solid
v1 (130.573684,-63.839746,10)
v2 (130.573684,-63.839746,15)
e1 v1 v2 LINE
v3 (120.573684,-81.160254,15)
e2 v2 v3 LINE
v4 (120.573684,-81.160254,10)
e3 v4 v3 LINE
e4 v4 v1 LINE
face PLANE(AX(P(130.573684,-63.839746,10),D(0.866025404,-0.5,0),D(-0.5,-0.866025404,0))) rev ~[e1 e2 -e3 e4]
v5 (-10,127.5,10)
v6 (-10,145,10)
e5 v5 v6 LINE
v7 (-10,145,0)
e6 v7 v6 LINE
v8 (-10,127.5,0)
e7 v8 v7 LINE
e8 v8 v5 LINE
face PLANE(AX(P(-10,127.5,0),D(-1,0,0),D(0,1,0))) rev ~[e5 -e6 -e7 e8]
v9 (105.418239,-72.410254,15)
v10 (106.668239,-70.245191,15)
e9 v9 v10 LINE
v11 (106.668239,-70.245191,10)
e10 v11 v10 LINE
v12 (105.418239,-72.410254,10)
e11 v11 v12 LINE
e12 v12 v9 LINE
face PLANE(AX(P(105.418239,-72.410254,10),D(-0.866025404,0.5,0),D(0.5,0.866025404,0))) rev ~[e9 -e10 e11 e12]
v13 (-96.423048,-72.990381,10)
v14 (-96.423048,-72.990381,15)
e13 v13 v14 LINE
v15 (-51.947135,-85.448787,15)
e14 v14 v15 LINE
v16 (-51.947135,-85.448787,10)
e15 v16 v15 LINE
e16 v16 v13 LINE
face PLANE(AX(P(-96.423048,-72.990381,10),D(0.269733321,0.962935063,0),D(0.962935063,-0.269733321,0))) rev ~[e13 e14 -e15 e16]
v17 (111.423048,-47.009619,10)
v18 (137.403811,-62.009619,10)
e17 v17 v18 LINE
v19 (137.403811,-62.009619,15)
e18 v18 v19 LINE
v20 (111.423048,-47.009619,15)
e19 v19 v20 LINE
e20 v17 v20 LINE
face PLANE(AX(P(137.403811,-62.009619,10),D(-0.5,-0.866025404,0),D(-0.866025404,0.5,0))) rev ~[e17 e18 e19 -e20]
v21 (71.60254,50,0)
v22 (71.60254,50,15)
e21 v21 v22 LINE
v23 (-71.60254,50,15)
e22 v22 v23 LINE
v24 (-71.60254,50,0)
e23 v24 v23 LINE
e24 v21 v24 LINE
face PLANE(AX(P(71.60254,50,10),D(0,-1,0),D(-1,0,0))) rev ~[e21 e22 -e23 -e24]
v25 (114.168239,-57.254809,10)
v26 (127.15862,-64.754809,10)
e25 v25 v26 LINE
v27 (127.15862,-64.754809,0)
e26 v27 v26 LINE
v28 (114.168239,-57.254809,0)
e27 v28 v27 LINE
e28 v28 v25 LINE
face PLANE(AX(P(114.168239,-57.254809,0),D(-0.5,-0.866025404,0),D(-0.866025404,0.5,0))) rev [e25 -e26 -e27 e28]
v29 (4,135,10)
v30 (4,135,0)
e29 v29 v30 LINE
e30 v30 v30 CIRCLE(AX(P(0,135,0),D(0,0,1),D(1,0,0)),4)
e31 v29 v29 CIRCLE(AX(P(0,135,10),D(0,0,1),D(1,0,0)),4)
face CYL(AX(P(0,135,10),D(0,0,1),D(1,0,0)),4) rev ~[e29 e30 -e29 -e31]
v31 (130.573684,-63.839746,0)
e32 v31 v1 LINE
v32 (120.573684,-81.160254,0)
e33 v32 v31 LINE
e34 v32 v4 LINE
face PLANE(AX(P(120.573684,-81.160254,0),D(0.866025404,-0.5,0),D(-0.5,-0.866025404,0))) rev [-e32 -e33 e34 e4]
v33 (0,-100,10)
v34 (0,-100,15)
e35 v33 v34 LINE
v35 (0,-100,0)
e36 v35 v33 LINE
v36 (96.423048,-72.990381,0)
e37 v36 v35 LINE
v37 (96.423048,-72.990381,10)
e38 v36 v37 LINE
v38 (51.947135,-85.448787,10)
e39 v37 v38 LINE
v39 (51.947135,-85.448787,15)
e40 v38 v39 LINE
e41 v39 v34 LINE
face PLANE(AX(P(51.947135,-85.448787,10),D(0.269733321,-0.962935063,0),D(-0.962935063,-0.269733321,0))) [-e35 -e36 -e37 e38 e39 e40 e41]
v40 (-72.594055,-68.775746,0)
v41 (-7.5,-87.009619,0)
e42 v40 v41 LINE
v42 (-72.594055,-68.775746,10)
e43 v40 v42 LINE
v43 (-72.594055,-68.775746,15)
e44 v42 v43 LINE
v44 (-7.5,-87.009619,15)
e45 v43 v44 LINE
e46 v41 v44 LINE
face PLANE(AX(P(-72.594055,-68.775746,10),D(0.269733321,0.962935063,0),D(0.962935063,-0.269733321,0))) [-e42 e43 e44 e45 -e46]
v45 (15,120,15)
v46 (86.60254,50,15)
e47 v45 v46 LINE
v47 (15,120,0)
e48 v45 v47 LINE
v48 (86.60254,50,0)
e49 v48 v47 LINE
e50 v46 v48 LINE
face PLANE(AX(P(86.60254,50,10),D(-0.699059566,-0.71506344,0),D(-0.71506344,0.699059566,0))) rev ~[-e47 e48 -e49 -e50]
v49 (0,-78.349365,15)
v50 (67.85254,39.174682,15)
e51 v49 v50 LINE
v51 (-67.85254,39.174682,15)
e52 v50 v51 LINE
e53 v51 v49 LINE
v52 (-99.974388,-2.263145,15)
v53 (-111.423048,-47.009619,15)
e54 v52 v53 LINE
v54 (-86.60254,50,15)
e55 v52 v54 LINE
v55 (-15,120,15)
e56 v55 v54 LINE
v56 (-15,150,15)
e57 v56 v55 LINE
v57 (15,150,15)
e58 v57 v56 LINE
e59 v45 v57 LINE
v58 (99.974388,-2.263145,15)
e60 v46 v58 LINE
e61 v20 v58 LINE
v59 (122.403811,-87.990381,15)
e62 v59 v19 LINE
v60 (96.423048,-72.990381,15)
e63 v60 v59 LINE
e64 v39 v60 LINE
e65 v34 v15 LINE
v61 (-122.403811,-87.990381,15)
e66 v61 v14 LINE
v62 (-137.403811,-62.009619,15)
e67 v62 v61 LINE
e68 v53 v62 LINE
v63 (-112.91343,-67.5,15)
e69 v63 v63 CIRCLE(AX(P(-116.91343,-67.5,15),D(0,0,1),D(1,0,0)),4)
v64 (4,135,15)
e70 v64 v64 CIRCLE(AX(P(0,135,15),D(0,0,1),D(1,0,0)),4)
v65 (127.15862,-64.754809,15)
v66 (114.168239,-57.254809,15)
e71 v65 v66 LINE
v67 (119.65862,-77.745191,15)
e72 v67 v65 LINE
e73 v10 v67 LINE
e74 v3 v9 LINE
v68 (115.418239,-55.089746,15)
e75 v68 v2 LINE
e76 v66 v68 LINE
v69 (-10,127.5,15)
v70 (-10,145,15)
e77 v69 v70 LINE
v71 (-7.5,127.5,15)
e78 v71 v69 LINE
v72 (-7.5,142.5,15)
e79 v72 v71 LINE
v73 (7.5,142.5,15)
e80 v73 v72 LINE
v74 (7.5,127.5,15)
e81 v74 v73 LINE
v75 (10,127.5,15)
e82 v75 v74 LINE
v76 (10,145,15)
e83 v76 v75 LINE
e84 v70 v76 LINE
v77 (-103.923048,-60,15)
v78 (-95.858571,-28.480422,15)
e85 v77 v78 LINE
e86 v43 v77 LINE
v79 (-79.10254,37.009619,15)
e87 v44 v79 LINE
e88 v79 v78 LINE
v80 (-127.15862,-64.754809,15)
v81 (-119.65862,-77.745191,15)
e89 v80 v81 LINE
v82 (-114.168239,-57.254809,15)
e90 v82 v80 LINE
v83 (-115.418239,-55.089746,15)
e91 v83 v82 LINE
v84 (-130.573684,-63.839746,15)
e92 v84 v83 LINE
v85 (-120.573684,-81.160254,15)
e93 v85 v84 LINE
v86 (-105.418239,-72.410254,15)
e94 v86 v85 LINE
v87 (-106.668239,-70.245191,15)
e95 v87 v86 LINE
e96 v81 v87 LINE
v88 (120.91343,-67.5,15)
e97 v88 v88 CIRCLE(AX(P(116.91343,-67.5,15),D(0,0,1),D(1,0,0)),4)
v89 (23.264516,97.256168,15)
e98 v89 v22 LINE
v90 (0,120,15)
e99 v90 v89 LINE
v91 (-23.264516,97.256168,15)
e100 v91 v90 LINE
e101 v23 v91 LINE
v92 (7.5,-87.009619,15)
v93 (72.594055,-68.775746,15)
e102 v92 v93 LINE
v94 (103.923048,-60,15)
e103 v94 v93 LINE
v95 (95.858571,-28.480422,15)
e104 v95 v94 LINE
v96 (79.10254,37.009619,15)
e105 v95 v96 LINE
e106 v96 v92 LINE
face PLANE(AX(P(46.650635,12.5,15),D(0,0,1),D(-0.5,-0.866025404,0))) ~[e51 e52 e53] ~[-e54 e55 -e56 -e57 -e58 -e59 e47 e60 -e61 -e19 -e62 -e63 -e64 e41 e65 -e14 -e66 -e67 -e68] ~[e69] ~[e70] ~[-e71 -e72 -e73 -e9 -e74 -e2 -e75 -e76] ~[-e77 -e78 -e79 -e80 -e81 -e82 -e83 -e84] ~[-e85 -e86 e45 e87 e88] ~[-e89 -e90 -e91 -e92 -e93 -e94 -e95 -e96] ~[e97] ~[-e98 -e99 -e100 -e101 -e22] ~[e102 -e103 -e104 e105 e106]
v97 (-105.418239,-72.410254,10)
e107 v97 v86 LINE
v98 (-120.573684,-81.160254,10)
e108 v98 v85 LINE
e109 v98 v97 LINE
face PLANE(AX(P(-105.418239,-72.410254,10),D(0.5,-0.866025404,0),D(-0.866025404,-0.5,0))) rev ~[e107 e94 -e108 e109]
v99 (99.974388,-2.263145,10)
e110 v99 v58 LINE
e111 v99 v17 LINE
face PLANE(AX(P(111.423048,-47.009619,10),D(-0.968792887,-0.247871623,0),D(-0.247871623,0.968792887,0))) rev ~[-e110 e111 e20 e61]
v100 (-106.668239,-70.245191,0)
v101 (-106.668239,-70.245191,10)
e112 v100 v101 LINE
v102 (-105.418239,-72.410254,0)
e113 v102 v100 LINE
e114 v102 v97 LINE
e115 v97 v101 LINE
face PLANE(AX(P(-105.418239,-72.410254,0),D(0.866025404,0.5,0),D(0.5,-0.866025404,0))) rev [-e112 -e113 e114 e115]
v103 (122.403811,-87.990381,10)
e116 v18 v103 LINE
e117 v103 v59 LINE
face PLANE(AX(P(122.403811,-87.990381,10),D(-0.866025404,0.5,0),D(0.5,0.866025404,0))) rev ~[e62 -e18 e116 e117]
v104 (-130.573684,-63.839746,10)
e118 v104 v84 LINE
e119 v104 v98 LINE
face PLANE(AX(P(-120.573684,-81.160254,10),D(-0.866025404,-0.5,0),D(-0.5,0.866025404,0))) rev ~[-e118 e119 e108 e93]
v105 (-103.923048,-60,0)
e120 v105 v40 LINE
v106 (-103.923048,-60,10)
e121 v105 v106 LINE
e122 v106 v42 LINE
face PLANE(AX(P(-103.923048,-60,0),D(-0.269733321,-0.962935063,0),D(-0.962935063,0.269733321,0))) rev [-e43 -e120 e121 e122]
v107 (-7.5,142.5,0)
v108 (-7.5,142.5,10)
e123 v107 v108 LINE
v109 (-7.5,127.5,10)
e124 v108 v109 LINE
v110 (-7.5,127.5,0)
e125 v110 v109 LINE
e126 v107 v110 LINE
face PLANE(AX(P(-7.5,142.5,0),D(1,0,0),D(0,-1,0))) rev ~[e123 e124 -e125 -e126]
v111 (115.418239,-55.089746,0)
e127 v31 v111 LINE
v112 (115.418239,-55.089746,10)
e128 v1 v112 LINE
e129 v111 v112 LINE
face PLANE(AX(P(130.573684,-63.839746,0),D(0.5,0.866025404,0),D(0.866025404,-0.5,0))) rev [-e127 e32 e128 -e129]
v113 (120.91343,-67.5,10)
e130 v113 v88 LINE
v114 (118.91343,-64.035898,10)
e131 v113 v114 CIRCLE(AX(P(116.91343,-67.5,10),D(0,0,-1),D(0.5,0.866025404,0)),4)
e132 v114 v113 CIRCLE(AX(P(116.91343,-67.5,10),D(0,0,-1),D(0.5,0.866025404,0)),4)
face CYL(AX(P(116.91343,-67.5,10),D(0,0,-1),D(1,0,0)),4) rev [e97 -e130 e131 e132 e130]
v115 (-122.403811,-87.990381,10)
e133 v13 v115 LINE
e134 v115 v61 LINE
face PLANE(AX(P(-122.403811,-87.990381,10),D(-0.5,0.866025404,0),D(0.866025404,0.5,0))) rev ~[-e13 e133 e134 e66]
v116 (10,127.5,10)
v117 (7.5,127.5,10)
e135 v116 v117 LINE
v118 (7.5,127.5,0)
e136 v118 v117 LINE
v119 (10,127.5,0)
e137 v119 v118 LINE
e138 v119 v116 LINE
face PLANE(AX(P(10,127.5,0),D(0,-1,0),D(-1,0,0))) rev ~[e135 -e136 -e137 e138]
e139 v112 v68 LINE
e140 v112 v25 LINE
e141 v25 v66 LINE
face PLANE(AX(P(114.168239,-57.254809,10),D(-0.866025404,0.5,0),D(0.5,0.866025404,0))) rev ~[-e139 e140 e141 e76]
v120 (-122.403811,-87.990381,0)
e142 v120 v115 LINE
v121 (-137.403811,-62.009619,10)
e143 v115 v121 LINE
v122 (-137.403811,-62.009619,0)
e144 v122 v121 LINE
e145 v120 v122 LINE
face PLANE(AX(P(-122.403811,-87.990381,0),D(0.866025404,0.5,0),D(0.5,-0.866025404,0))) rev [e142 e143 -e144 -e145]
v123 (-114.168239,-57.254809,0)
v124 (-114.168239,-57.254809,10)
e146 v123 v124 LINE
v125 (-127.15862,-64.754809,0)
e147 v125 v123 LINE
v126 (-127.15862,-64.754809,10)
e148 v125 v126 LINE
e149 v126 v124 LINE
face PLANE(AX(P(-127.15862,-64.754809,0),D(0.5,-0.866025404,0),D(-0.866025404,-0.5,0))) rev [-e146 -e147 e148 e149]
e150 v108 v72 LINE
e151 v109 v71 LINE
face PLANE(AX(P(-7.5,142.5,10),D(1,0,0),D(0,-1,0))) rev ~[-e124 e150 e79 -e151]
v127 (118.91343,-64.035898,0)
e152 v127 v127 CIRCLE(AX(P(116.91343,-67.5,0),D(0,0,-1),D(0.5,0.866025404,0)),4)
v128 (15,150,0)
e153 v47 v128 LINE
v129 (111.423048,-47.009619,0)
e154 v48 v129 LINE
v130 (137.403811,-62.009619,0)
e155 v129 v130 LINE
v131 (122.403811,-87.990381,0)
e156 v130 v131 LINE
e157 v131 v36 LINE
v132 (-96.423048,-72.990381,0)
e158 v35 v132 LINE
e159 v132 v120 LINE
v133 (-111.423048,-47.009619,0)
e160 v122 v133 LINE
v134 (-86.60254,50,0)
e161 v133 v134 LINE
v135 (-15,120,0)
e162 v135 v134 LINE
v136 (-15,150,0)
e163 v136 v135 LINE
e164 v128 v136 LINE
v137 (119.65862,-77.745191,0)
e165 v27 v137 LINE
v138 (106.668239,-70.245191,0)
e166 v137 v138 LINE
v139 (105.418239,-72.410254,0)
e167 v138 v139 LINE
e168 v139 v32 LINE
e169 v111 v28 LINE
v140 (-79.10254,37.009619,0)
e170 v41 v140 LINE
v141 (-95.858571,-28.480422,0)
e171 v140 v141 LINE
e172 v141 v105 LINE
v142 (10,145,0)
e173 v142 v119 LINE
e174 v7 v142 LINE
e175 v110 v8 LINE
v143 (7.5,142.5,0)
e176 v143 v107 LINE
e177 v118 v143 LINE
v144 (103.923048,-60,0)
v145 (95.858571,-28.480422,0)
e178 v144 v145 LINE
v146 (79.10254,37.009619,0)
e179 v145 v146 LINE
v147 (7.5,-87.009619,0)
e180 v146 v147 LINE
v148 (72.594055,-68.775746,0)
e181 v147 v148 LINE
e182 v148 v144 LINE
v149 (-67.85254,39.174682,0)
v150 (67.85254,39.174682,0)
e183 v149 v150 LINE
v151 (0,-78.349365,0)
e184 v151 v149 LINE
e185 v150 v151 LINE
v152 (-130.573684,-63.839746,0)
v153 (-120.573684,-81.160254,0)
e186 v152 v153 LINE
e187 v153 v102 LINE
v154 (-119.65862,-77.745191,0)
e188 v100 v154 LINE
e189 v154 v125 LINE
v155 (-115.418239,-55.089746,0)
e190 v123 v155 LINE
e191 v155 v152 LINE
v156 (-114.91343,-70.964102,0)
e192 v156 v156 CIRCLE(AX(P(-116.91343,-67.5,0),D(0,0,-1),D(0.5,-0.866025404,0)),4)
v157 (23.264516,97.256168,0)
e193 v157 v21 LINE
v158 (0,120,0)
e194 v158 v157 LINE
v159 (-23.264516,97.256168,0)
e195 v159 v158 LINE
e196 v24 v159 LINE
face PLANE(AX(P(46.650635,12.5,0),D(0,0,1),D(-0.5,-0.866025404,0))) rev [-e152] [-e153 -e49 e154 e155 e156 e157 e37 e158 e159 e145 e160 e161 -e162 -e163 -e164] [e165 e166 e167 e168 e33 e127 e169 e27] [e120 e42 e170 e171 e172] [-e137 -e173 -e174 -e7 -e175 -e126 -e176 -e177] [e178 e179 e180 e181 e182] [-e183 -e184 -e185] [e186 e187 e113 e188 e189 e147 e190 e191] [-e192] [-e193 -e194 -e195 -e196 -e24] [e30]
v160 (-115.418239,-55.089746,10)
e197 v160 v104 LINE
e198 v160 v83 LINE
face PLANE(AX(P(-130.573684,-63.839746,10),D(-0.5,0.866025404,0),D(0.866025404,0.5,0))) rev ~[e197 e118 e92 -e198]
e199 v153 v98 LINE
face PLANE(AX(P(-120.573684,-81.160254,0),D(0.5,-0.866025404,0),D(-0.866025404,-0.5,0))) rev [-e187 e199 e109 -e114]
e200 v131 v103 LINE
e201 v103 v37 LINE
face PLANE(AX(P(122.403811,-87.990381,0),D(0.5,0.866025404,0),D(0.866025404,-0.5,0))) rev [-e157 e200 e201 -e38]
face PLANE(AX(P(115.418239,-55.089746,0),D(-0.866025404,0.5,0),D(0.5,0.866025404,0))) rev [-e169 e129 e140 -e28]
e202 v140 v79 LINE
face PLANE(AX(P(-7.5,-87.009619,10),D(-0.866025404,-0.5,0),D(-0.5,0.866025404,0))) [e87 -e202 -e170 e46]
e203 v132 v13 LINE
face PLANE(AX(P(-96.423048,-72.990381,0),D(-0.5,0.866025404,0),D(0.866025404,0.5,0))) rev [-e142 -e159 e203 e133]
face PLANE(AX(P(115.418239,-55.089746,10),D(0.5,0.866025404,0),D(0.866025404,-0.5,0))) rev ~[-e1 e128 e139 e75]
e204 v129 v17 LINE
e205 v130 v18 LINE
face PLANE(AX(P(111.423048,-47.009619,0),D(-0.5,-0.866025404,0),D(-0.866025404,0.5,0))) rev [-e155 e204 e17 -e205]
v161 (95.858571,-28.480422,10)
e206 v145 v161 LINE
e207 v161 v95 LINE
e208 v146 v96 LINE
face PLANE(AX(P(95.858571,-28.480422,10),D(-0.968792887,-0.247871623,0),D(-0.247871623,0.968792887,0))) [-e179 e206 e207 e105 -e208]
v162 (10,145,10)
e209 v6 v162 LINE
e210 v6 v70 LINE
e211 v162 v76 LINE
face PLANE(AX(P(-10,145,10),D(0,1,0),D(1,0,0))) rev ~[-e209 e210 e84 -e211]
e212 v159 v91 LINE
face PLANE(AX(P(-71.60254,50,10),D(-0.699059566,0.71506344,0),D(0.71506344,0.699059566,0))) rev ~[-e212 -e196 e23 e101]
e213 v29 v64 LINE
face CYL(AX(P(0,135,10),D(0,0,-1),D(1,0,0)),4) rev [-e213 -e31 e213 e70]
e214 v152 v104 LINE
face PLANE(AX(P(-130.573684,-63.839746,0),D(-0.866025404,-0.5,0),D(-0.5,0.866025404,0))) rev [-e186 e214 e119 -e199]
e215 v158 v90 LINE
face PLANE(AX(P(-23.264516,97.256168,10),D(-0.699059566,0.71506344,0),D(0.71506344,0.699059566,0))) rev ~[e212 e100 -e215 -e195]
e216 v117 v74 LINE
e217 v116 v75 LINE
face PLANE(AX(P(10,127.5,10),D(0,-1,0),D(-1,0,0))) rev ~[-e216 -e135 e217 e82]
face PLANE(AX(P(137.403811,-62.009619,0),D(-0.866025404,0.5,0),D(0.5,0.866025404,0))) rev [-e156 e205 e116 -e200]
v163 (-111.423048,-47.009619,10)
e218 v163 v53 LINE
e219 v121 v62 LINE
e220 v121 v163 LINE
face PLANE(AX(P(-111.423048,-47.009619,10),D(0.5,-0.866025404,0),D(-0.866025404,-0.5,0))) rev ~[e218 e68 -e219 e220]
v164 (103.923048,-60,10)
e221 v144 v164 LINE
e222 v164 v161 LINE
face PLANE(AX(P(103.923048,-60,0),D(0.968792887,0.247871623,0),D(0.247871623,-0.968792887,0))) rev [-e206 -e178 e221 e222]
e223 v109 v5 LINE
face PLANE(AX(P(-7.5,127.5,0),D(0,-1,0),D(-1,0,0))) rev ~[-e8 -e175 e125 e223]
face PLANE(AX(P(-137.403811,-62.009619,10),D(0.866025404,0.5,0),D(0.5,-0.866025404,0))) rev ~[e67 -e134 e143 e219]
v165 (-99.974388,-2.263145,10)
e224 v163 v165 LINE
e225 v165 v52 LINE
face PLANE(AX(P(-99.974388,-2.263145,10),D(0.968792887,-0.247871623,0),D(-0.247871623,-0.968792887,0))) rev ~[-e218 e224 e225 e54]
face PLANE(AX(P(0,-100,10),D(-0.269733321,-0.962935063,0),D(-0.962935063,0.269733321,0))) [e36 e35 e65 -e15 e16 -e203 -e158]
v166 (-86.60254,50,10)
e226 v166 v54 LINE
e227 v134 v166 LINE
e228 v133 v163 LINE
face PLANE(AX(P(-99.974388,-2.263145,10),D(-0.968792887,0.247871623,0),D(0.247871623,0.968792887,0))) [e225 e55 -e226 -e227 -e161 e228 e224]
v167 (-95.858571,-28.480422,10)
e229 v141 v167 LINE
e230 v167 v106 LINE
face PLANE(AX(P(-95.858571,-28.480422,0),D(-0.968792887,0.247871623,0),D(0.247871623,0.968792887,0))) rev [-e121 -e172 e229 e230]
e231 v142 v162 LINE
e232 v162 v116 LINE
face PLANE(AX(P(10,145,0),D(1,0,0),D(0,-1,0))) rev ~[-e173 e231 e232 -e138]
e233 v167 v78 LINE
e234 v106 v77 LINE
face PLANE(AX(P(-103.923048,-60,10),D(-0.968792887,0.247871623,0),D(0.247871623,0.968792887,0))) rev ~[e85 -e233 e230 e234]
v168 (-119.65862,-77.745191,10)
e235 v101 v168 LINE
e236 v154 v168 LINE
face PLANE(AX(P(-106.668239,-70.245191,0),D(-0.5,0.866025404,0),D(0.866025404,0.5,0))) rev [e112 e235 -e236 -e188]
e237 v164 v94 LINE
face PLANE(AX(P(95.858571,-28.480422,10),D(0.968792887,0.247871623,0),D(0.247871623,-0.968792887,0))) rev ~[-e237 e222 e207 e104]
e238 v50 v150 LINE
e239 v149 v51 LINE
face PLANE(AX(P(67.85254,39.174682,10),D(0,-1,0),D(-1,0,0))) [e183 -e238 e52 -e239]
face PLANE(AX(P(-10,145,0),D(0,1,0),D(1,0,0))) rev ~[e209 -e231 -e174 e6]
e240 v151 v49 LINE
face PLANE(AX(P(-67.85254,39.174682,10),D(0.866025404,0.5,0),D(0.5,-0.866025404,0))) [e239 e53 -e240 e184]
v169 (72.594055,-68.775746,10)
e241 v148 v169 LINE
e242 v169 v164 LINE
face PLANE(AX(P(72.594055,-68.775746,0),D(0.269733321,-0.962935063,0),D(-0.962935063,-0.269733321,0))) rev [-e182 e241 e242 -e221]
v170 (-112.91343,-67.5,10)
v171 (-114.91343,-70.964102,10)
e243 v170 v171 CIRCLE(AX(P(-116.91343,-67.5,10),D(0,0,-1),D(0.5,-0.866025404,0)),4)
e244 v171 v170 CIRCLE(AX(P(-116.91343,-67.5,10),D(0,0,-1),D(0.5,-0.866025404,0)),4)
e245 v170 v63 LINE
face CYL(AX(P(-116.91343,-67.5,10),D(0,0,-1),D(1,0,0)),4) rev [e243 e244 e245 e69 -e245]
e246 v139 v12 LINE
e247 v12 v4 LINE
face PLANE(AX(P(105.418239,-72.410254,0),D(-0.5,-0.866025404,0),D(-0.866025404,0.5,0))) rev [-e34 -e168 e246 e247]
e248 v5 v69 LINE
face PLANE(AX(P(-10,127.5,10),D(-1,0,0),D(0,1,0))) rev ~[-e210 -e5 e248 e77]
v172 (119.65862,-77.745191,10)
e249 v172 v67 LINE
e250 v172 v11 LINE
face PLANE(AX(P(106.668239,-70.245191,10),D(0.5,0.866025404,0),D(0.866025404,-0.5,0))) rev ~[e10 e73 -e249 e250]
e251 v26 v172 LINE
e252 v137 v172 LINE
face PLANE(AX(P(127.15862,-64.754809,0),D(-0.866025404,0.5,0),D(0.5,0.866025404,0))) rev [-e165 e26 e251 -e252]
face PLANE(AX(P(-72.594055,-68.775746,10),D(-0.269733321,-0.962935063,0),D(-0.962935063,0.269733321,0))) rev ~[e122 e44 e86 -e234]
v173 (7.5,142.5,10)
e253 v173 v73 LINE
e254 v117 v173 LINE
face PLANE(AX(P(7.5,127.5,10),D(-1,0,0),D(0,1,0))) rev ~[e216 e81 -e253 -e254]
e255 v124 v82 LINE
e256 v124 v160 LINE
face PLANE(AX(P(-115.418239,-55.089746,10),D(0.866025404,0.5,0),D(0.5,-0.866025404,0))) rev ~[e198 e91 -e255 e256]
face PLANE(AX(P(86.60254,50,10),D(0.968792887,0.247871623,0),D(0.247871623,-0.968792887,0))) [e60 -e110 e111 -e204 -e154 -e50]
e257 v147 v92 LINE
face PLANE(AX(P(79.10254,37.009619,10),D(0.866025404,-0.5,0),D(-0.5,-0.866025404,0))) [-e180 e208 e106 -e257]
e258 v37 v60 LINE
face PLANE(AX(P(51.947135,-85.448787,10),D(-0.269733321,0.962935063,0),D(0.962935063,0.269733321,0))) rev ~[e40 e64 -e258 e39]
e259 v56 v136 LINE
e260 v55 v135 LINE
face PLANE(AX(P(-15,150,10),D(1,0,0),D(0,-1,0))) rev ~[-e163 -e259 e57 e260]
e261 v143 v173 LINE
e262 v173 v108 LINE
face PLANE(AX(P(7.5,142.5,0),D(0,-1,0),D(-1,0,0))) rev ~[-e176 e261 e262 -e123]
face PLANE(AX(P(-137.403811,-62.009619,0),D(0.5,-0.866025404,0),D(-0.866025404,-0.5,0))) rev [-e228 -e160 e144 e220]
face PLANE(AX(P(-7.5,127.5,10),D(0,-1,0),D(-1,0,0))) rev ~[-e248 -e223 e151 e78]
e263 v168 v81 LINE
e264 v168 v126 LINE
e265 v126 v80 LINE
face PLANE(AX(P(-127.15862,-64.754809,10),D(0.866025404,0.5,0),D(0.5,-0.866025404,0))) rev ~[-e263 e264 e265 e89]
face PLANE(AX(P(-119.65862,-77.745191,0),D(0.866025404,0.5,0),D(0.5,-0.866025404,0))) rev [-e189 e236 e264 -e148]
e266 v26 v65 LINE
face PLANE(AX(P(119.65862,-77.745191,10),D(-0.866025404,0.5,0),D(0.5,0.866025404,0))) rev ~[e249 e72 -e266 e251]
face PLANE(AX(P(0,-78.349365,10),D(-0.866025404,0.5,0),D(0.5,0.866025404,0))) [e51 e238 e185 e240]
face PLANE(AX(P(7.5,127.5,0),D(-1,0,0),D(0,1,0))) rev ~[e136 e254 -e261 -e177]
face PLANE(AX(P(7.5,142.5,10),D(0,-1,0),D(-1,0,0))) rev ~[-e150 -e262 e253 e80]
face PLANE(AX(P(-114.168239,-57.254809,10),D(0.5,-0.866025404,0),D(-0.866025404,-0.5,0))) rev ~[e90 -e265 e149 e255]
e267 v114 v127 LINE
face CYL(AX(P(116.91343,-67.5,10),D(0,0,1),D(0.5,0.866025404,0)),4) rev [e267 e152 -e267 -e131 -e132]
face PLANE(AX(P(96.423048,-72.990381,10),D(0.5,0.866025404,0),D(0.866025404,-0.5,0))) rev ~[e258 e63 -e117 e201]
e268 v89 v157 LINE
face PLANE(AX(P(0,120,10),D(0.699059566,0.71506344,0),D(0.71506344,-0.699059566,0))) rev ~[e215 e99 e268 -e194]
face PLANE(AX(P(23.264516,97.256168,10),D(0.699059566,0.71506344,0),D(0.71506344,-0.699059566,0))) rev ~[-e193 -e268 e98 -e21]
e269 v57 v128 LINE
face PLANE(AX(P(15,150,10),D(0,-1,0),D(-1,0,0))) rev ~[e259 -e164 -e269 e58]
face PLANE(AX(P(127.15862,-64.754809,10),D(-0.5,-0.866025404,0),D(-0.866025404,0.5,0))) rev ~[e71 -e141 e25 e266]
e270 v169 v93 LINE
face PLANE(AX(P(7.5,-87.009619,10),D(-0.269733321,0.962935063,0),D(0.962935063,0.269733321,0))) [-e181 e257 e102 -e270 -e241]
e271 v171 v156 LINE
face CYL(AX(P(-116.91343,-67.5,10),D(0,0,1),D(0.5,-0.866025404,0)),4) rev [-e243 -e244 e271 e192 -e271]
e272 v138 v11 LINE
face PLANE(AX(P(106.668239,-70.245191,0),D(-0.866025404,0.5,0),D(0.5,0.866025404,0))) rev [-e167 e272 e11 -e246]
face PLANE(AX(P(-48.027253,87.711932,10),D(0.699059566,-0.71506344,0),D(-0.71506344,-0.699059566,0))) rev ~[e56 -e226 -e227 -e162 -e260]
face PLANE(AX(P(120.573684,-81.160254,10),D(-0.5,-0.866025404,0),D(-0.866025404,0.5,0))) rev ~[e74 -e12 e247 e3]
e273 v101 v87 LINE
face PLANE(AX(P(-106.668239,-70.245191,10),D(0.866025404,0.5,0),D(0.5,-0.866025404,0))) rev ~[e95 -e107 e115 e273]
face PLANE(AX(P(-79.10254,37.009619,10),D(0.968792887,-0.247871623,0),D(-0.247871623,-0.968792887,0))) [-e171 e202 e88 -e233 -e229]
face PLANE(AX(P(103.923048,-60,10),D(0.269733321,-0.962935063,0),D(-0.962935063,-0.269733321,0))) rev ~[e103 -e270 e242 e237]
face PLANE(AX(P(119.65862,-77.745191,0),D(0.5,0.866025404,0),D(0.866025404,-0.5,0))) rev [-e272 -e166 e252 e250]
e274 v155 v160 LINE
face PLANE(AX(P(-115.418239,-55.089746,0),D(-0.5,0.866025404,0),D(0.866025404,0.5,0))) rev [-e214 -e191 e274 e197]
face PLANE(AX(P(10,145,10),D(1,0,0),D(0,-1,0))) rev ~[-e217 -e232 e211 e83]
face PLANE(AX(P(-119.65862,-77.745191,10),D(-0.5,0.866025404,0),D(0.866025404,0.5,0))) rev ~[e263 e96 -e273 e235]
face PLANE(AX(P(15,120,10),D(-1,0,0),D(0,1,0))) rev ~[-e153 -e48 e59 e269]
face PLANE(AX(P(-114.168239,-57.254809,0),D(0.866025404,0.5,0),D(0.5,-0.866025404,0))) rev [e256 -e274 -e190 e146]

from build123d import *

# Parameters (mm, degrees)
F1_DEPTH  = 10
F2_R      = 4
F3_DEPTH  = 25
F7_DEPTH  = 25
F8_R      = 4
F9_DEPTH  = 5
F10_DEPTH = 5


# Not quite as in the source:
# - after a boolean that leaves OpenCascade's solid faulty, fix() repairs it


with BuildPart() as f1:
    # F0 (on Top) → F1 (new body)
    with BuildSketch(Plane.XY):
        Polygon((0, 0), (86.6025403784, 50), (71.6025403784, 50), (0, 50), align=None)
        Polygon((-86.6025403784, 50), (0, 0), (0, 50), (-71.6025403784, 50), align=None)
        Polygon((0, 120), (15, 120), (15, 150), (-15, 150), (-15, 120), align=None)
        Polygon((10, 125), (0, 125), (-10, 125), (-10, 127.5), (-10, 145), (10, 145), (10, 127.5), align=None, mode=Mode.SUBTRACT)
        with BuildLine():
            Line((71.6025403784, 50), (86.6025403784, 50))
            Line((86.6025403784, 50), (48.027253047, 87.7119317126))
            ThreePointArc((48.027253047, 87.7119317126), (35.9639012974, 93.309151767), (23.2645159855, 97.2561684211))
            Line((23.2645159855, 97.2561684211), (71.6025403784, 50))
        make_face()
        with BuildLine():
            Line((-48.027253047, 87.7119317126), (-86.6025403784, 50))
            Line((-86.6025403784, 50), (-71.6025403784, 50))
            Line((-71.6025403784, 50), (-23.2645159855, 97.2561684211))
            ThreePointArc((-23.2645159855, 97.2561684211), (-35.9639012974, 93.309151767), (-48.027253047, 87.7119317126))
        make_face()
        with BuildLine():
            ThreePointArc((23.2645159855, 97.2561684211), (35.9639012974, 93.309151767), (48.027253047, 87.7119317126))
            Line((48.027253047, 87.7119317126), (15, 120))
            Line((15, 120), (0, 120))
            Line((0, 120), (23.2645159855, 97.2561684211))
        make_face()
        with BuildLine():
            Line((-23.2645159855, 97.2561684211), (0, 120))
            Line((0, 120), (-15, 120))
            Line((-15, 120), (-48.027253047, 87.7119317126))
            ThreePointArc((-48.027253047, 87.7119317126), (-35.9639012974, 93.309151767), (-23.2645159855, 97.2561684211))
        make_face()
        Polygon((-7.5, 127.5), (7.5, 127.5), (0, 135), align=None)
        Polygon((0, 135), (7.5, 127.5), (7.5, 142.5), align=None)
        Polygon((-7.5, 142.5), (-7.5, 127.5), (0, 135), align=None)
        Polygon((0, 135), (7.5, 142.5), (-7.5, 142.5), align=None)
        Polygon((-10, 125), (0, 125), (10, 125), (10, 127.5), (7.5, 127.5), (-7.5, 127.5), (-10, 127.5), align=None)
    extrude(amount=F1_DEPTH)

    # F2 (on face) → F3 (cut)
    with BuildSketch(Plane.XY.offset(10)):
        with Locations((0, 135)):
            Circle(F2_R)
    extrude(amount=-F3_DEPTH, mode=Mode.SUBTRACT)


with BuildPart() as f4_1:
    # F4: instance of F1
    add(f1.part.mirror(Plane(origin=(-43.3012701892, 25, 5), x_dir=(0.8660254038, -0.5, 0), z_dir=(-0.5, -0.8660254038, 0))))


with BuildPart() as f1_1:
    add(f1.part)

    add(f4_1.part)  # F5 merges F4_1
    # F5: F1 across face
    add(f1.part.mirror(Plane(origin=(43.3012701892, 25, 5), x_dir=(0.8660254038, 0.5, 0), z_dir=(0.5, -0.8660254038, 0))))

    # F6 (on face) → F7 (cut)
    with BuildSketch(Plane.XY.offset(10)):
        Polygon((67.8525403784, 39.1746824527), (-67.8525403784, 39.1746824527), (0, -78.3493649054), align=None)
    extrude(amount=-F7_DEPTH, mode=Mode.SUBTRACT)

    # F8 (on face) → F9 (join)
    with BuildSketch(Plane.XY.offset(10)):
        with BuildLine():
            Line((0, 120), (-15, 120))
            Line((-15, 120), (-48.027253047, 87.7119317126))
            ThreePointArc((-48.027253047, 87.7119317126), (-35.9639012974, 93.3091517669), (-23.2645159855, 97.2561684211))
            Line((-23.2645159855, 97.2561684211), (0, 120))
        make_face()
        with BuildLine():
            Line((15, 120), (0, 120))
            Line((0, 120), (23.2645159855, 97.2561684211))
            ThreePointArc((23.2645159855, 97.2561684211), (35.9639012974, 93.3091517669), (48.027253047, 87.7119317126))
            Line((48.027253047, 87.7119317126), (15, 120))
        make_face()
        Polygon((15, 150), (-15, 150), (-15, 120), (0, 120), (15, 120), align=None)
        with Locations((0, 135)):
            Circle(F8_R, mode=Mode.SUBTRACT)
        Polygon((-7.5, 127.5), (-10, 127.5), (-10, 145), (10, 145), (10, 127.5), (7.5, 127.5), (7.5, 142.5), (-7.5, 142.5), align=None, mode=Mode.SUBTRACT)
        Polygon((137.4038105677, -62.0096189432), (111.4230484541, -47.0096189432), (103.9230484541, -60), (96.4230484541, -72.9903810568), (122.4038105677, -87.9903810568), align=None)
        Polygon((119.6586200393, -77.7451905284), (127.1586200393, -64.7548094716), (114.1682389825, -57.2548094716), (115.4182389825, -55.0897459622), (130.5736835487, -63.8397459622), (120.5736835487, -81.1602540378), (105.4182389825, -72.4102540378), (106.6682389825, -70.2451905284), align=None, mode=Mode.SUBTRACT)
        with Locations((116.9134295109, -67.5)):
            Circle(F8_R, mode=Mode.SUBTRACT)
        with BuildLine():
            Line((111.4230484541, -47.0096189432), (99.9743876016, -2.2631446437))
            ThreePointArc((99.9743876016, -2.2631446437), (98.7900464845, -15.5089237407), (95.8585705202, -28.4804223604))
            Line((95.8585705202, -28.4804223604), (103.9230484541, -60))
            Line((103.9230484541, -60), (111.4230484541, -47.0096189432))
        make_face()
        with BuildLine():
            Line((103.9230484541, -60), (72.5940545347, -68.7757460608))
            ThreePointArc((72.5940545347, -68.7757460608), (62.826145187, -77.8002280263), (51.9471345547, -85.448787069))
            Line((51.9471345547, -85.448787069), (96.4230484541, -72.9903810568))
            Line((96.4230484541, -72.9903810568), (103.9230484541, -60))
        make_face()
        Polygon((-103.9230484541, -60), (-111.4230484541, -47.0096189432), (-137.4038105677, -62.0096189432), (-122.4038105677, -87.9903810568), (-96.4230484541, -72.9903810568), align=None)
        Polygon((-120.5736835487, -81.1602540378), (-130.5736835487, -63.8397459622), (-115.4182389825, -55.0897459622), (-114.1682389825, -57.2548094716), (-127.1586200393, -64.7548094716), (-119.6586200393, -77.7451905284), (-106.6682389825, -70.2451905284), (-105.4182389825, -72.4102540378), align=None, mode=Mode.SUBTRACT)
        with Locations((-116.9134295109, -67.5)):
            Circle(F8_R, mode=Mode.SUBTRACT)
        with BuildLine():
            ThreePointArc((-95.8585705202, -28.4804223604), (-98.7900464845, -15.5089237407), (-99.9743876016, -2.2631446437))
            Line((-99.9743876016, -2.2631446437), (-111.4230484541, -47.0096189432))
            Line((-111.4230484541, -47.0096189432), (-103.9230484541, -60))
            Line((-103.9230484541, -60), (-95.8585705202, -28.4804223604))
        make_face()
        with BuildLine():
            Line((-72.5940545347, -68.7757460608), (-103.9230484541, -60))
            Line((-103.9230484541, -60), (-96.4230484541, -72.9903810568))
            Line((-96.4230484541, -72.9903810568), (-51.9471345547, -85.448787069))
            ThreePointArc((-51.9471345547, -85.448787069), (-62.826145187, -77.8002280263), (-72.5940545347, -68.7757460608))
        make_face()
    extrude(amount=F9_DEPTH)

    # F10 (add): a face of the model
    f10_faces = [f1_1.faces().sort_by_distance(p)[0] for p in [
        (25.2159598464, -90.0197712228, 10),
    ]]
    extrude(f10_faces, amount=F10_DEPTH)

    add(f1_1.part.fix(), mode=Mode.REPLACE)


solid = f1_1.part
